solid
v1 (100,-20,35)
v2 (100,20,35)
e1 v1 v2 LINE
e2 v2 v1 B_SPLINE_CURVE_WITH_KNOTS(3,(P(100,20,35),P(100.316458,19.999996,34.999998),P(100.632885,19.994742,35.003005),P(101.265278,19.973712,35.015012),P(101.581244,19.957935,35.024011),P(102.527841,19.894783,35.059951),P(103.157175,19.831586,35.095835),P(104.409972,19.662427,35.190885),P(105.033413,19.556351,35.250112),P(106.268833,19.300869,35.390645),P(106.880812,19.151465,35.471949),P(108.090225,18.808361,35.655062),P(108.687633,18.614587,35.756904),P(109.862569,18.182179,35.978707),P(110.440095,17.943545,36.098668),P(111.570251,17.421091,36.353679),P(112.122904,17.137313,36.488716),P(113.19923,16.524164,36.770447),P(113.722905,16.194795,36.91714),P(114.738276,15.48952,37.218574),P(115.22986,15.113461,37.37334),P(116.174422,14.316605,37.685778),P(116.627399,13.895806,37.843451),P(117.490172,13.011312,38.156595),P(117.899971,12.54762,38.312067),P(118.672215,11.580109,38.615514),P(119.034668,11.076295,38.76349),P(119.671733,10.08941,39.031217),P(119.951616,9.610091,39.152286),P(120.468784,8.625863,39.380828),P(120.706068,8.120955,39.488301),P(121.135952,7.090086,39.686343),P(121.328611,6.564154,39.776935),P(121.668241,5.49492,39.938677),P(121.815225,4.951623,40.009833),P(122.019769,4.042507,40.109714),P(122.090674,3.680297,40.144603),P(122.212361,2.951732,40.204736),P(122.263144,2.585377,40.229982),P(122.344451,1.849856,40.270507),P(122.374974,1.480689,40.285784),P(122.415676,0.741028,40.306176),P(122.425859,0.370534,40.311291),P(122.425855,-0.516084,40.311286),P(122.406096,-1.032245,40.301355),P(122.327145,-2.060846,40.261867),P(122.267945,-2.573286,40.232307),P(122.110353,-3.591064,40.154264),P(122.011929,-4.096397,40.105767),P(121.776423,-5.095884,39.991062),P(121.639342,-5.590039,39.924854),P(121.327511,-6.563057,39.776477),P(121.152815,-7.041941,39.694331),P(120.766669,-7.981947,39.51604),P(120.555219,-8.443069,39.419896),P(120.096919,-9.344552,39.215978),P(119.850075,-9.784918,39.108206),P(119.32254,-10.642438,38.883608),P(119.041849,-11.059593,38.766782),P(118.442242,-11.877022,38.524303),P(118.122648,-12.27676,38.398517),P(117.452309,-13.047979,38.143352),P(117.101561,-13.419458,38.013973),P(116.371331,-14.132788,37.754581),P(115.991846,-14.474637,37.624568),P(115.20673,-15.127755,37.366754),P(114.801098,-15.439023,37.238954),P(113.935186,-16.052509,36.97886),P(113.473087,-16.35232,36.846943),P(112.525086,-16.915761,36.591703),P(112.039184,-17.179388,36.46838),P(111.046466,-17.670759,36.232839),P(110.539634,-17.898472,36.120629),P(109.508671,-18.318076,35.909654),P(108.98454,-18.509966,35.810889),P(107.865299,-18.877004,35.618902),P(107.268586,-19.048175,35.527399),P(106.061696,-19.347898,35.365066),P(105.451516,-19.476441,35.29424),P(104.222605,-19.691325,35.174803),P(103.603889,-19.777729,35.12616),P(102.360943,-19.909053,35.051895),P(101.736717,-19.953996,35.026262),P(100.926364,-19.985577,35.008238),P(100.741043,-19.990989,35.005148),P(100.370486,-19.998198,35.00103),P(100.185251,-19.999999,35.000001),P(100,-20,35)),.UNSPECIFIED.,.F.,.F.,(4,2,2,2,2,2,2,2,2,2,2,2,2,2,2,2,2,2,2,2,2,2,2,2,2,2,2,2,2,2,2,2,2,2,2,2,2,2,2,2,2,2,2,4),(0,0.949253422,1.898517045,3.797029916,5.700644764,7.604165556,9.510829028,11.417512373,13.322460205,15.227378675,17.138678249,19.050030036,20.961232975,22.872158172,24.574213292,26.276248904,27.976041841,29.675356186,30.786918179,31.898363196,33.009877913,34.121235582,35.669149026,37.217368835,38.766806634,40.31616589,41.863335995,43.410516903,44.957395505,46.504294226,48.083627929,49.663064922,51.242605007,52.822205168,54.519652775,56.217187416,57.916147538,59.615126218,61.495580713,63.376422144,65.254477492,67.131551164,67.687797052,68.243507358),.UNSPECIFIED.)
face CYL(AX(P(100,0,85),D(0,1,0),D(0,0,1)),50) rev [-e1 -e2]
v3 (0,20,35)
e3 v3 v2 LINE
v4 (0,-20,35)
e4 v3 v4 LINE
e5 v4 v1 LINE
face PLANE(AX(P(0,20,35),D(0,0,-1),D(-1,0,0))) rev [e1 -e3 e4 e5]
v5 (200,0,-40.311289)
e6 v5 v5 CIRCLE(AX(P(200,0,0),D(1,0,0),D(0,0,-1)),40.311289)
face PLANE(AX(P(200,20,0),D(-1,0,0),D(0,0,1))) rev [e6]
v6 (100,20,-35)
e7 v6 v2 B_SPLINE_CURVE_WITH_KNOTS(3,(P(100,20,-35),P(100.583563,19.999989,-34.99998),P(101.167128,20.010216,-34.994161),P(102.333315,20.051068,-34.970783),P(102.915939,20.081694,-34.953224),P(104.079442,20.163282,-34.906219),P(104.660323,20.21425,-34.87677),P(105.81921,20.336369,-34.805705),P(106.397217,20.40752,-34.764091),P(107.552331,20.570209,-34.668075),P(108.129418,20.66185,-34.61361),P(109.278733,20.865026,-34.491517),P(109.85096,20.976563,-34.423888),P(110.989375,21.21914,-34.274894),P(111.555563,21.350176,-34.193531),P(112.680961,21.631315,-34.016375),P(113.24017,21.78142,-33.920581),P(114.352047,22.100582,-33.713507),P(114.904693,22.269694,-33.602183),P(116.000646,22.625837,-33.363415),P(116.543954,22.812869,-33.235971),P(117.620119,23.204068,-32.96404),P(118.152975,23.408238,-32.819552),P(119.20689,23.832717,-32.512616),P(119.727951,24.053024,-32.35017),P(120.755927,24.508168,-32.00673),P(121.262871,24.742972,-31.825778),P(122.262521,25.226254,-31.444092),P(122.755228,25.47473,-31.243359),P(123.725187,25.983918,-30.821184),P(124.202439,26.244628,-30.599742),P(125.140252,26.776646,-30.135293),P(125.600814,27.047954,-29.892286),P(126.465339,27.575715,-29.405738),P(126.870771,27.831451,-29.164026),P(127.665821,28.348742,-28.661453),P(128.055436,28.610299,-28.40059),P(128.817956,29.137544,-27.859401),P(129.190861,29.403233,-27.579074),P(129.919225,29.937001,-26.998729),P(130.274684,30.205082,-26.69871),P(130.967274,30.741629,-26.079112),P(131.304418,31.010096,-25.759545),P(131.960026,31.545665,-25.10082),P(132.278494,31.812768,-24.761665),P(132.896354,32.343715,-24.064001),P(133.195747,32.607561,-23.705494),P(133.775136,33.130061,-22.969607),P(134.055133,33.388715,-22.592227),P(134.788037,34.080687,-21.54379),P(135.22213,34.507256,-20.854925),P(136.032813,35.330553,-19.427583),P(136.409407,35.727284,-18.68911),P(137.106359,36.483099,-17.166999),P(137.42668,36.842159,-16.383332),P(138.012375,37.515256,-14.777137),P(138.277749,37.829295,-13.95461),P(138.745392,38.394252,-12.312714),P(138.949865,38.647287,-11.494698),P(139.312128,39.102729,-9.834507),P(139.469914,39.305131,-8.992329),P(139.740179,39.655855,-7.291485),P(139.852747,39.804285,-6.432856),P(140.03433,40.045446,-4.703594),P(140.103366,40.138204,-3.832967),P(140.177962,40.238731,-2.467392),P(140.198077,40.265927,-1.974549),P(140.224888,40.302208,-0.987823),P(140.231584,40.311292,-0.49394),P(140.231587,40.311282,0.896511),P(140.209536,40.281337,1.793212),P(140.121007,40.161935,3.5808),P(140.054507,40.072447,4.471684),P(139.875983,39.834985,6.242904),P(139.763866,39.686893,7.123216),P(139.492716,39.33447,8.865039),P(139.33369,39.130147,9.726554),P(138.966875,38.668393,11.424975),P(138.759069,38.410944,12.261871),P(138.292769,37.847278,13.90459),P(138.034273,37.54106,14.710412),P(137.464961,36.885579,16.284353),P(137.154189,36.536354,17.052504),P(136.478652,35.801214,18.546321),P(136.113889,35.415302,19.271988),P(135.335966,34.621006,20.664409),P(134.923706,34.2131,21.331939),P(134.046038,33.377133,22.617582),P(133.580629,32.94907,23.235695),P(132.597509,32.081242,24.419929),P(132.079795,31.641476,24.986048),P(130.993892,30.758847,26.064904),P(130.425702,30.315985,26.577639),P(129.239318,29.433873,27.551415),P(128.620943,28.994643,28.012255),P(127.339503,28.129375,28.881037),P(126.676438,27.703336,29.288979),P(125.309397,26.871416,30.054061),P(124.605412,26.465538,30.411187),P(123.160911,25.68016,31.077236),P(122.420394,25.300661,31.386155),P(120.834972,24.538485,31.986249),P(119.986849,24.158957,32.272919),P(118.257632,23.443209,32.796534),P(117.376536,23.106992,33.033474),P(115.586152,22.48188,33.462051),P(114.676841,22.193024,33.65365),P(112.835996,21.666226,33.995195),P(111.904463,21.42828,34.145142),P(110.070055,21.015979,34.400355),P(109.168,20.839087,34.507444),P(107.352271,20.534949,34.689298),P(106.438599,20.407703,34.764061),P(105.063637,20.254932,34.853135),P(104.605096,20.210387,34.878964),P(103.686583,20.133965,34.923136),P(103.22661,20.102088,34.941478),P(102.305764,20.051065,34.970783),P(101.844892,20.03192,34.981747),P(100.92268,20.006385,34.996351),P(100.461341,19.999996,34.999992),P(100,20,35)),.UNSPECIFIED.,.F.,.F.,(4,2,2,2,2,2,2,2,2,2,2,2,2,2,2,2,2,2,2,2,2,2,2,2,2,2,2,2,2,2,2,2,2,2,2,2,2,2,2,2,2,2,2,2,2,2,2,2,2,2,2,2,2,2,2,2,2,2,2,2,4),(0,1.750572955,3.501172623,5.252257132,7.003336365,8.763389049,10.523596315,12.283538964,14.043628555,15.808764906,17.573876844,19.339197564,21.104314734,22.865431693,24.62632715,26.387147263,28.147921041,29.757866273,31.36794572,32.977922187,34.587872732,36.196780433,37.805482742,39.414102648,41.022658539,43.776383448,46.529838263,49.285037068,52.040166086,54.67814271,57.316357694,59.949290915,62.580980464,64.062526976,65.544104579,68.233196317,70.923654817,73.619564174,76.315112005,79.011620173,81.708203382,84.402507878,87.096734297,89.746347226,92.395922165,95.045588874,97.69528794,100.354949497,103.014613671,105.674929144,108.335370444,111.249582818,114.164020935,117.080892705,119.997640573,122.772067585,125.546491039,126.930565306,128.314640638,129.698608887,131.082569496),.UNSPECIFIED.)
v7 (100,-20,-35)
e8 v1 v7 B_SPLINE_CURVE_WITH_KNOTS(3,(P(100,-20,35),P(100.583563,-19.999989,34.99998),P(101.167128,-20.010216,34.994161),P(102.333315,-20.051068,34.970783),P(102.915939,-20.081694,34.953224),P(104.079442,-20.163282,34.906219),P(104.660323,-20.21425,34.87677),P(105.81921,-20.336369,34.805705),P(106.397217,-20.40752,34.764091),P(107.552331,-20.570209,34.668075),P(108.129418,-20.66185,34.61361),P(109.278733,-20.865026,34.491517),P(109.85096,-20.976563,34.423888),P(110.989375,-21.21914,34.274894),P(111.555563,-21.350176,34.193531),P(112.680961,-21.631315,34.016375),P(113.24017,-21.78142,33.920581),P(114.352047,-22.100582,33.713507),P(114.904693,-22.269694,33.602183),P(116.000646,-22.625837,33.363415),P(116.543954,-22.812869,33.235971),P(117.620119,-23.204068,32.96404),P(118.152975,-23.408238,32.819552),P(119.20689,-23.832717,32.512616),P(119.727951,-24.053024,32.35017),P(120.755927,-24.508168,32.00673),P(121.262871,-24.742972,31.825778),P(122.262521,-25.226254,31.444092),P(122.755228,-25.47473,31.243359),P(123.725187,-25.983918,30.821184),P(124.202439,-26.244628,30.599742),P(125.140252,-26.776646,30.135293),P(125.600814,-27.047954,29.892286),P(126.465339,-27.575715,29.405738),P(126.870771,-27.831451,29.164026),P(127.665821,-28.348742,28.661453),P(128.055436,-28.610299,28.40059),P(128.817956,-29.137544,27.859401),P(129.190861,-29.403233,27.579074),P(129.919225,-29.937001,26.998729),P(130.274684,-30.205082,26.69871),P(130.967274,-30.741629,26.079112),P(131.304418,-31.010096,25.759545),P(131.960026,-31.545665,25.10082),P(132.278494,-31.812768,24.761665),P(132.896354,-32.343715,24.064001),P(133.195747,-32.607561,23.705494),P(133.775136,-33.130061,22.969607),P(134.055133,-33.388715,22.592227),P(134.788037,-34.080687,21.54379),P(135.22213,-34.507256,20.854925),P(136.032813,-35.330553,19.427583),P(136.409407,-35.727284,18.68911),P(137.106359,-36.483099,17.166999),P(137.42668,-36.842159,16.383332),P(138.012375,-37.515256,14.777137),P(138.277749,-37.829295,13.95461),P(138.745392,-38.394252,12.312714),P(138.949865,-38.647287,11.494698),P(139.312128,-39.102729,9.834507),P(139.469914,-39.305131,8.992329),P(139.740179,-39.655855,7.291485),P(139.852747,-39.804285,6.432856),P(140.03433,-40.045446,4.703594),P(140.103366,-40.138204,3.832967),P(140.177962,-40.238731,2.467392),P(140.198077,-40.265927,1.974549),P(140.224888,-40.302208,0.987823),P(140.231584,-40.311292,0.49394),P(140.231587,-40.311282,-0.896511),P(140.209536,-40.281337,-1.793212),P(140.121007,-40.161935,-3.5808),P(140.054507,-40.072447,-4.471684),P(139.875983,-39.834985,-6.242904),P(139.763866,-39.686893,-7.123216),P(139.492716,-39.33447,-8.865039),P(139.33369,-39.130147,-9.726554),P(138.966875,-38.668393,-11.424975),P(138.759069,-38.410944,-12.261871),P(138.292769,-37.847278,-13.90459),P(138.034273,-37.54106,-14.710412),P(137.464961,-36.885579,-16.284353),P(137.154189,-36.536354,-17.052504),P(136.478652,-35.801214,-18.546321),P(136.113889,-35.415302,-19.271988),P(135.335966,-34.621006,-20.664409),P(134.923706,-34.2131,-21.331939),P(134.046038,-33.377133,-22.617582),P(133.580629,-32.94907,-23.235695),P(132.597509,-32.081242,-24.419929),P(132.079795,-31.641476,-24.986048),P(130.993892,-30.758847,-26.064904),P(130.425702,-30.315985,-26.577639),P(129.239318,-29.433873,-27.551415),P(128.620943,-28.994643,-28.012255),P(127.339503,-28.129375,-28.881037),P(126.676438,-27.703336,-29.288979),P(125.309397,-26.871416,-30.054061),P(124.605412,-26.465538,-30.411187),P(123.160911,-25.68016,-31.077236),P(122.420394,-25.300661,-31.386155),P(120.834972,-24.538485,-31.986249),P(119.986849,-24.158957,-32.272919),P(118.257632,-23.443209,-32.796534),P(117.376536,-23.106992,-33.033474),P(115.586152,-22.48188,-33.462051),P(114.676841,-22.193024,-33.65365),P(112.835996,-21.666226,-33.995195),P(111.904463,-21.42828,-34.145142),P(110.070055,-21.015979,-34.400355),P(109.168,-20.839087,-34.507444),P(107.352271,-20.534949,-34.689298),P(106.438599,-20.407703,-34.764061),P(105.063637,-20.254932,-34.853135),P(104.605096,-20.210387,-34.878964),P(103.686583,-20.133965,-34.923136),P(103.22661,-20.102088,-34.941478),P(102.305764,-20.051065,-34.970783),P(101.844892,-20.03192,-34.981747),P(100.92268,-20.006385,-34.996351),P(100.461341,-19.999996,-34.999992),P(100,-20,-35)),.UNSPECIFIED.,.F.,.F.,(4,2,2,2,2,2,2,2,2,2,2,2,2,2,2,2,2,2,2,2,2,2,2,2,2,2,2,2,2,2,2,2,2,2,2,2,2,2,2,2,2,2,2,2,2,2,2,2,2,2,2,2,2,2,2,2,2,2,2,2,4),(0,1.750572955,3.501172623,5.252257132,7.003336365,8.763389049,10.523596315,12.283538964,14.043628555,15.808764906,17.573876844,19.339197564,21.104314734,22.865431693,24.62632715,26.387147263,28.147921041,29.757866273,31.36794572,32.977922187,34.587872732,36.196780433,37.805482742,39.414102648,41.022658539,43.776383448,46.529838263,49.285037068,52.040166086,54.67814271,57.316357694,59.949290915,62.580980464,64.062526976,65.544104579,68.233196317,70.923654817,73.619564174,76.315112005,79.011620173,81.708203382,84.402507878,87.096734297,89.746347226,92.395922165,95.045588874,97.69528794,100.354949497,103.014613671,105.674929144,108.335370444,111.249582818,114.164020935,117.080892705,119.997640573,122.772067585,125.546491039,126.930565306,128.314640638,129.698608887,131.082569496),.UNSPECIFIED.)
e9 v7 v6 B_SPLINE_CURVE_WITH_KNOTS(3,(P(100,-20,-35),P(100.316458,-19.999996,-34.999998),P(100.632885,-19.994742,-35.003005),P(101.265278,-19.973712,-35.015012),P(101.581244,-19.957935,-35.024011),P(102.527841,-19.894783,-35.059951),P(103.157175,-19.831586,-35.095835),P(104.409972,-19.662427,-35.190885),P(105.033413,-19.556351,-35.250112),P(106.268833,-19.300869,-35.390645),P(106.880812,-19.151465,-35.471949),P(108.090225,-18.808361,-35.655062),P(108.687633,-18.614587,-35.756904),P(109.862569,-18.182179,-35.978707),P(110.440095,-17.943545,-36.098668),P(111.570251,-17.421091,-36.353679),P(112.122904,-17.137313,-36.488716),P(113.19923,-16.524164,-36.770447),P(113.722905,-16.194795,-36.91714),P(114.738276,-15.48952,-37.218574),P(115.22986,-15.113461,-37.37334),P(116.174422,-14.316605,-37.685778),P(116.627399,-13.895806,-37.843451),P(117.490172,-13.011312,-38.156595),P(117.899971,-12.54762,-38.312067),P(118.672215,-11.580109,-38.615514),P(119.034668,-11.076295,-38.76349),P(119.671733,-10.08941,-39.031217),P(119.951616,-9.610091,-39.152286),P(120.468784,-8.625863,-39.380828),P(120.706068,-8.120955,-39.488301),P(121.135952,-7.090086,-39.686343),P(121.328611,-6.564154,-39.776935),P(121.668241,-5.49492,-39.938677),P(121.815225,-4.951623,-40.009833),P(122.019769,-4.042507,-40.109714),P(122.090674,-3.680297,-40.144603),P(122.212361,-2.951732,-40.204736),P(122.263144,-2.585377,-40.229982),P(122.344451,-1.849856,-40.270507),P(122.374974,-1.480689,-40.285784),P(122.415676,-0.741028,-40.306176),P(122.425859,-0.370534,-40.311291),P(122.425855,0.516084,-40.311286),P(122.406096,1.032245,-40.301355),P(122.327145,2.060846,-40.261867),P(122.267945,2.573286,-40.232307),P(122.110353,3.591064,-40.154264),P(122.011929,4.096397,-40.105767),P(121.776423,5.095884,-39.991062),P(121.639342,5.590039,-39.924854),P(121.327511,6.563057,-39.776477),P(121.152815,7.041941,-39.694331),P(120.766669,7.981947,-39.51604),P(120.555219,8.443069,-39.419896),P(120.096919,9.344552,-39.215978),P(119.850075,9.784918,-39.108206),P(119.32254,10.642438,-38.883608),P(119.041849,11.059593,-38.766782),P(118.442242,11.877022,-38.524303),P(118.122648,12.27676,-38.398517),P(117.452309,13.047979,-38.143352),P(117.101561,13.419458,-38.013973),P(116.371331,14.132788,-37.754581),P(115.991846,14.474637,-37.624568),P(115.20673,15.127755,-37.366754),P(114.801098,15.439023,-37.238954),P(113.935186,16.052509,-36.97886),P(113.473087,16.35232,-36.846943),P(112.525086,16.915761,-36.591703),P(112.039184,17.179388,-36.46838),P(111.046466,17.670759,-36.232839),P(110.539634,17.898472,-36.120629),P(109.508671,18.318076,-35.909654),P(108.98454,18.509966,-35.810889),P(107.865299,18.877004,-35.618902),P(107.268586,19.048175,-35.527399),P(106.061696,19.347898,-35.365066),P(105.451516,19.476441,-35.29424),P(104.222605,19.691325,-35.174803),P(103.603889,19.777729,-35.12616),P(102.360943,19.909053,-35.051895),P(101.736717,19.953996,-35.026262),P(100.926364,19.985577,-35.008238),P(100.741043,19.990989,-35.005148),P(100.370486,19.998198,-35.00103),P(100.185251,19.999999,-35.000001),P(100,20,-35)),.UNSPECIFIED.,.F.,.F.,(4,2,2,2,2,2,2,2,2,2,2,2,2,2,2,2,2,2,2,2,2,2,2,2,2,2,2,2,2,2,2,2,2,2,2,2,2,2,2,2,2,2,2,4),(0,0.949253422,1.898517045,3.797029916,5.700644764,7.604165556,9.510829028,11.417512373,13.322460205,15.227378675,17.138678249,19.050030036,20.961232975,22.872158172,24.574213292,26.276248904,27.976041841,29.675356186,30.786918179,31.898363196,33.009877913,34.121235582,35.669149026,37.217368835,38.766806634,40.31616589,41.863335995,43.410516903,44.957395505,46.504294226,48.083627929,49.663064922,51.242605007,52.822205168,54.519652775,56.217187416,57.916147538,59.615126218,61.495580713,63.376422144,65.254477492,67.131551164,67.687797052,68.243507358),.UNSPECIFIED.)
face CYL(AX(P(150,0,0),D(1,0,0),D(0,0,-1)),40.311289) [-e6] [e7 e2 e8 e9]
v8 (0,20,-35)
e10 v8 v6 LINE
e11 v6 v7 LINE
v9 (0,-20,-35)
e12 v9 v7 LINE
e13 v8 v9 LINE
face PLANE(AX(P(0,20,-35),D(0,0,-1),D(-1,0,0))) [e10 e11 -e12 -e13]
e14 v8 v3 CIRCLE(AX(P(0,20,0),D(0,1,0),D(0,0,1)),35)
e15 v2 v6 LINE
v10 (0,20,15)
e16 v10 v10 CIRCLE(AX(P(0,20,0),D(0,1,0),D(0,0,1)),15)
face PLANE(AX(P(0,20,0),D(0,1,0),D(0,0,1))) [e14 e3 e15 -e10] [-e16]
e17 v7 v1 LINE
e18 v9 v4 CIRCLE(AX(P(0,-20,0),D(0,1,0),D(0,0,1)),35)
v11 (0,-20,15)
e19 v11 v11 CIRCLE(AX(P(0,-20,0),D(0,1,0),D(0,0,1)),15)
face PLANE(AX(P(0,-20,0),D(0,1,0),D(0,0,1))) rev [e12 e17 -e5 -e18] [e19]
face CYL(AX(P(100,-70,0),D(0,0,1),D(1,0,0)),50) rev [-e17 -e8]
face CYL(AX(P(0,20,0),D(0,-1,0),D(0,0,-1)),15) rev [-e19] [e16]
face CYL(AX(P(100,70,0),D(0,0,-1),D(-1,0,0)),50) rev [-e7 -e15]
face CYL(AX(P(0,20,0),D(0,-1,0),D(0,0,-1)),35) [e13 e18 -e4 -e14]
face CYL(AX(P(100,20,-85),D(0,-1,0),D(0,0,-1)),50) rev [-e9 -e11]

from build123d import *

# Parameters (mm, degrees)
SKETCH2_R           = 15
BOSS_EXTRUDE1_DEPTH = 20
SKETCH3_R           = 40.311288741
BOSS_EXTRUDE2_DEPTH = 50
FILLET1_R           = 50
FILLET2_R           = 50


with BuildPart() as part:
    # Sketch2 → Boss-Extrude1 (new, symmetric)
    with BuildSketch(Plane(origin=(0, 0, 0), x_dir=(1, 0, 0), z_dir=(0, 1, 0))):
        with BuildLine():
            Line((0, 35), (200, 35))
            Line((200, 35), (200, -35))
            Line((200, -35), (0, -35))
            ThreePointArc((0, -35), (-35, 0), (0, 35))
        make_face()
        with Locations(Location((0, 0, 0), (0, 0, 270))):
            Circle(SKETCH2_R, mode=Mode.SUBTRACT)
    extrude(amount=BOSS_EXTRUDE1_DEPTH, both=True)

    # Sketch3 → Boss-Extrude2 (add)
    with BuildSketch(Plane(origin=(200, 0, 0), x_dir=(0, 0, -1), z_dir=(1, 0, 0))):
        Circle(SKETCH3_R)
    extrude(amount=-BOSS_EXTRUDE2_DEPTH)

    # Fillet1
    # the kernel refuses this fillet: 50 mm, written as the material it adds along each edge
    with BuildSketch(Plane(origin=(150, -145, -35), x_dir=(-1, 0, 0), z_dir=(0, 1, 0))) as fillet1_piece_1_section:
        with BuildLine():
            CenterArc((FILLET1_R, -FILLET1_R), FILLET1_R, 90, 90)
            Line((0, -FILLET1_R), (0, 0))
            Line((0, 0), (FILLET1_R, 0))
        make_face()
    fillet1_piece_1 = extrude(amount=290, mode=Mode.PRIVATE)
    fillet1_piece_1 = fillet1_piece_1 & Plane(origin=(131.355668078, 0, 0), x_dir=(0, 0, -1), z_dir=(1, 0, 0)) * Cylinder(40.311288741, 781, mode=Mode.PRIVATE)
    add(fillet1_piece_1)
    with BuildSketch(Plane(origin=(150, 145, 35), x_dir=(0, 0, 1), z_dir=(0, -1, 0))) as fillet1_piece_2_section:
        with BuildLine():
            CenterArc((FILLET1_R, FILLET1_R), FILLET1_R, 180, 90)
            Line((0, FILLET1_R), (0, 0))
            Line((0, 0), (FILLET1_R, 0))
        make_face()
    fillet1_piece_2 = extrude(amount=290, mode=Mode.PRIVATE)
    fillet1_piece_2 = fillet1_piece_2 & Plane(origin=(131.35565772, 0, 0), x_dir=(0, 0, -1), z_dir=(1, 0, 0)) * Cylinder(40.311288741, 780, mode=Mode.PRIVATE)
    add(fillet1_piece_2)

    # Fillet2
    # the kernel refuses this fillet: 50 mm, written as the material it adds along each edge
    with BuildSketch(Plane(origin=(150, -20, -160), x_dir=(-1, 0, 0), z_dir=(0, 0, 1))) as fillet2_piece_1_section:
        with BuildLine():
            CenterArc((FILLET2_R, FILLET2_R), FILLET2_R, 180, 90)
            Line((0, FILLET2_R), (0, 0))
            Line((0, 0), (FILLET2_R, 0))
        make_face()
    fillet2_piece_1 = extrude(amount=320, mode=Mode.PRIVATE)
    fillet2_piece_1 = fillet2_piece_1 & Plane(origin=(135.236587788, 0, 0), x_dir=(0, 0, -1), z_dir=(1, 0, 0)) * Cylinder(40.311288741, 840, mode=Mode.PRIVATE)
    add(fillet2_piece_1)
    with BuildSketch(Plane(origin=(150, 20, -160), x_dir=(-1, 0, 0), z_dir=(0, 0, 1))) as fillet2_piece_2_section:
        with BuildLine():
            CenterArc((FILLET2_R, -FILLET2_R), FILLET2_R, 90, 90)
            Line((0, -FILLET2_R), (0, 0))
            Line((0, 0), (FILLET2_R, 0))
        make_face()
    fillet2_piece_2 = extrude(amount=320, mode=Mode.PRIVATE)
    fillet2_piece_2 = fillet2_piece_2 & Plane(origin=(135.236587787, 0, 0), x_dir=(0, 0, -1), z_dir=(1, 0, 0)) * Cylinder(40.311288741, 840, mode=Mode.PRIVATE)
    add(fillet2_piece_2)


solid = part.part
